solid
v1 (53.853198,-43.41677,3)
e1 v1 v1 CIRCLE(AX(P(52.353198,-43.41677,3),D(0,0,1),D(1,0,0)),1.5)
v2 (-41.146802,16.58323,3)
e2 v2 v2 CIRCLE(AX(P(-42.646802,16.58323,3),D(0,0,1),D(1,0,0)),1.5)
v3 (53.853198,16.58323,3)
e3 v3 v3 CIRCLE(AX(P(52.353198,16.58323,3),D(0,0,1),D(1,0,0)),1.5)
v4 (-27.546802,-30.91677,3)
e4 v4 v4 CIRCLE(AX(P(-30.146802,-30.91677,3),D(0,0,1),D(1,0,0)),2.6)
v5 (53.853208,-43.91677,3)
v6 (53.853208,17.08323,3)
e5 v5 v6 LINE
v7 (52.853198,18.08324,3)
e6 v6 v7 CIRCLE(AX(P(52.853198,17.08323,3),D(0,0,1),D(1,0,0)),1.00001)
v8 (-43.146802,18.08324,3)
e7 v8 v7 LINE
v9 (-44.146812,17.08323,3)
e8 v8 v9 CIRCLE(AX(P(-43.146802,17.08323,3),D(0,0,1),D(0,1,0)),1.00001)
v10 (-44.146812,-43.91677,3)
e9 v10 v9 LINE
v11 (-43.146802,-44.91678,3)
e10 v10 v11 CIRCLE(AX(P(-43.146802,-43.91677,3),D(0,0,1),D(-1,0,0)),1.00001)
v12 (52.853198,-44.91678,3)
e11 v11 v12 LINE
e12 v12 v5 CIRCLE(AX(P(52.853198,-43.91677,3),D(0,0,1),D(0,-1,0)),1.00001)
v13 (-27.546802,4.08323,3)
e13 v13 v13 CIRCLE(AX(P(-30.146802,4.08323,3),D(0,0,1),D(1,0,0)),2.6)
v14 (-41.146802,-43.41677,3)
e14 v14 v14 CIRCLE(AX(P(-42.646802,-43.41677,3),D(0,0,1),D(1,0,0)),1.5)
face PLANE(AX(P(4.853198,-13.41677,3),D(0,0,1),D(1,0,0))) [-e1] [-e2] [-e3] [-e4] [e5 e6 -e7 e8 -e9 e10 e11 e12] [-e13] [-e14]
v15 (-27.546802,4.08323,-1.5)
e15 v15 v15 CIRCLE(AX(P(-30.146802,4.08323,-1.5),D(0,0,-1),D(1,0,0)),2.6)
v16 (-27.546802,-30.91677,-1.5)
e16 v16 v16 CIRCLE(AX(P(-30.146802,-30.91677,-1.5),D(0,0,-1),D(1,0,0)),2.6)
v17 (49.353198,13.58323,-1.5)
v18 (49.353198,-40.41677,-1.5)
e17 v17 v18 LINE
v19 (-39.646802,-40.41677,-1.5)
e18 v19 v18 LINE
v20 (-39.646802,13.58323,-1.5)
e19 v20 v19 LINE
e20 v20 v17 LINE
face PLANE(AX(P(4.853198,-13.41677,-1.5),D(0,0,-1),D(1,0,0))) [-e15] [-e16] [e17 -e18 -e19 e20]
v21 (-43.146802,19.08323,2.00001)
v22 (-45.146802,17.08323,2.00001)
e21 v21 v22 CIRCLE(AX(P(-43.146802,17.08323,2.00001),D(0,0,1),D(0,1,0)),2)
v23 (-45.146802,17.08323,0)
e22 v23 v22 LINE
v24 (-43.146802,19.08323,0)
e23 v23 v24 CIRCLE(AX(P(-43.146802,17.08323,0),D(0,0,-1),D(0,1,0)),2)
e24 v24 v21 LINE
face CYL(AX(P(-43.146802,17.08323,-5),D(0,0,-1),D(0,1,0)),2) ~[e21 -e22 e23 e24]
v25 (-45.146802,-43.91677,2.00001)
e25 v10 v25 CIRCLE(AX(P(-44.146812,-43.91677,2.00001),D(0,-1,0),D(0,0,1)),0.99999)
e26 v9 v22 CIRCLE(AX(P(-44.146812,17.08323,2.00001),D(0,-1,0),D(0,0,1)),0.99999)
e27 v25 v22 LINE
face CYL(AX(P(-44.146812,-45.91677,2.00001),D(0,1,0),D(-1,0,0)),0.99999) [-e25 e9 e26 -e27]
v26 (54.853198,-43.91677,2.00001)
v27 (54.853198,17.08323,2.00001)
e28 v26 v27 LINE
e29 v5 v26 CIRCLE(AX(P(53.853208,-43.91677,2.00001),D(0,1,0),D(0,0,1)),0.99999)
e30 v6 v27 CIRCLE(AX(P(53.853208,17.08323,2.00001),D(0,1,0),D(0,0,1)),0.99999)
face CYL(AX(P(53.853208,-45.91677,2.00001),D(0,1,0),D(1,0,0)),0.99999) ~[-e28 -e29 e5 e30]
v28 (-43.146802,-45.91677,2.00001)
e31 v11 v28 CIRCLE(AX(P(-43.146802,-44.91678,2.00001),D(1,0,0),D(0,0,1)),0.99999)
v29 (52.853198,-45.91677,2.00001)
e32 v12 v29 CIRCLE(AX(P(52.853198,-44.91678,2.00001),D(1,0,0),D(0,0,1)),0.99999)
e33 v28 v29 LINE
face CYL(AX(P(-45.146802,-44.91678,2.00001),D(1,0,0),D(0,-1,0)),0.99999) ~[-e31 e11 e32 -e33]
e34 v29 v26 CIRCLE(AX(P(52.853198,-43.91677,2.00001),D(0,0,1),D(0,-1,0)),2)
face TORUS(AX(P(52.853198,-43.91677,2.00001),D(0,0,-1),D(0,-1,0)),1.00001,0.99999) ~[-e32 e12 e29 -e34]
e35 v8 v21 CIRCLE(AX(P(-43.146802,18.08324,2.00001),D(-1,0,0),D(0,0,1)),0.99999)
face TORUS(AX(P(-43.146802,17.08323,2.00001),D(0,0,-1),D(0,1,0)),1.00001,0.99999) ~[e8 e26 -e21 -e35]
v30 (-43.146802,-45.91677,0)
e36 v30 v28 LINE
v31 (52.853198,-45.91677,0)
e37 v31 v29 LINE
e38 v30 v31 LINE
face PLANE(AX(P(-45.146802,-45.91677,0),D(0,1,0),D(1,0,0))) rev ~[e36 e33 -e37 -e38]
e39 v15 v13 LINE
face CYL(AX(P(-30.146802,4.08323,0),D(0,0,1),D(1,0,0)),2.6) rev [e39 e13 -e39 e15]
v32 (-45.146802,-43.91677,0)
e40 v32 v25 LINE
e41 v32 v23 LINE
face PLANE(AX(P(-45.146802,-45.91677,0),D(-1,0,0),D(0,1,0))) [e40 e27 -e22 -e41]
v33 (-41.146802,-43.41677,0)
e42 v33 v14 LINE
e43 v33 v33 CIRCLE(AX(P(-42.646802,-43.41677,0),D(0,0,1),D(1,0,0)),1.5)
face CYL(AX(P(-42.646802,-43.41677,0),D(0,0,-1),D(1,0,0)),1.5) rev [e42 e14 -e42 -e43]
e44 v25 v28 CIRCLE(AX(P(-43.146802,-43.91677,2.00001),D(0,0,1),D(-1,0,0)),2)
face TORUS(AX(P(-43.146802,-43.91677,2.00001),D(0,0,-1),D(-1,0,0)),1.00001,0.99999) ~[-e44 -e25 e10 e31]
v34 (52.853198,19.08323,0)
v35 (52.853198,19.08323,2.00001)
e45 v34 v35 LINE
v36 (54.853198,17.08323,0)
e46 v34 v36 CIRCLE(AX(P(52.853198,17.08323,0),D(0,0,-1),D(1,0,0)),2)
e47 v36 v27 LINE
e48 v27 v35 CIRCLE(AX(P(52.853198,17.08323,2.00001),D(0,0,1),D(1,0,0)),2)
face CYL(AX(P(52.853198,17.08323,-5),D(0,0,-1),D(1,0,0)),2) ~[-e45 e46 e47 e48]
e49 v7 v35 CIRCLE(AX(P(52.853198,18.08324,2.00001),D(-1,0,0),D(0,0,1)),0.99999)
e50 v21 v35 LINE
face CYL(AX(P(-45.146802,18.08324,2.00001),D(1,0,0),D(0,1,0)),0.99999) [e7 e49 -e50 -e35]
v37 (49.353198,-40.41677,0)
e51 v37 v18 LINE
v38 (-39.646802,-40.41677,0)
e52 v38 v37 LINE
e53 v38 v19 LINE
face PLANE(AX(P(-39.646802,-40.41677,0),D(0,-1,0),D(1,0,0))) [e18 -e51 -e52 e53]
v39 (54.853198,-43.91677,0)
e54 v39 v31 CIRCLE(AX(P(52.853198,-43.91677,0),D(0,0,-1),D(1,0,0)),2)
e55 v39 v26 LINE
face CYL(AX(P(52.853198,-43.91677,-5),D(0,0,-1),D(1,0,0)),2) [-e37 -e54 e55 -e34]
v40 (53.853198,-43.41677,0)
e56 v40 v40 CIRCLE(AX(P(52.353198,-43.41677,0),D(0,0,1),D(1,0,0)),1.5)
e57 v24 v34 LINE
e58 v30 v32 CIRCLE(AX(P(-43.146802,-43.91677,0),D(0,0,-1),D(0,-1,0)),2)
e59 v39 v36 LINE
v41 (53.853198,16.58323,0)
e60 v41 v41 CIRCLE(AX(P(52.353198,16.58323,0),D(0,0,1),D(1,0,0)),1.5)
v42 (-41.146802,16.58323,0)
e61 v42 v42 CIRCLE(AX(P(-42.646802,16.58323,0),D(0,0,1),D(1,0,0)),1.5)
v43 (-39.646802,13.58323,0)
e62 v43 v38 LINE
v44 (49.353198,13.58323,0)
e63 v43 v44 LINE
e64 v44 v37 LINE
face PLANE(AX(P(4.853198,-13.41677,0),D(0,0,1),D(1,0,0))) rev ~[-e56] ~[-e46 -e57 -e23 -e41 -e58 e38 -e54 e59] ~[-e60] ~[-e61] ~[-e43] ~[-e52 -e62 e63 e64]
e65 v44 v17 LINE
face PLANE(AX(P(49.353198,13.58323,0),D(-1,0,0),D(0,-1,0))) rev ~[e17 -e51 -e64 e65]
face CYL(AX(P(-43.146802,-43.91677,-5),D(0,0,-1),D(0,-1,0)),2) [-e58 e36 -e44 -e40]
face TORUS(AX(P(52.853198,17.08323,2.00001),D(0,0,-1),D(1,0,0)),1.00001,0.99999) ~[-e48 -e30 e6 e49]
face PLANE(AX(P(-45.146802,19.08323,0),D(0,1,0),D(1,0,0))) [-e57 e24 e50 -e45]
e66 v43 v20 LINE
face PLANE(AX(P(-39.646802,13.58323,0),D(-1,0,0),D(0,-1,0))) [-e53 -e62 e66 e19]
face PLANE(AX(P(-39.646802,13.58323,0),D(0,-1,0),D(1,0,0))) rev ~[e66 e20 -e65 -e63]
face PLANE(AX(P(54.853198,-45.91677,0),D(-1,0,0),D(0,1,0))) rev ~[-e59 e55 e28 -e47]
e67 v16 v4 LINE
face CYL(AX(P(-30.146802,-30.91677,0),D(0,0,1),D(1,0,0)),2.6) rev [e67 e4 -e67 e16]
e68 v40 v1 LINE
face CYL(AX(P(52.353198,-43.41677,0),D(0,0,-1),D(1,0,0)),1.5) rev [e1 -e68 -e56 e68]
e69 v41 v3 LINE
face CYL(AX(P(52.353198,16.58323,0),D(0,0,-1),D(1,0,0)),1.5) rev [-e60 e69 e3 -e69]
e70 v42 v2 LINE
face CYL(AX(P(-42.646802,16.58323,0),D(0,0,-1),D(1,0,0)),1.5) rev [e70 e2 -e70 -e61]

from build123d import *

# Parameters (mm, degrees)
F0_W         = 100
F0_H         = 65
F0_R         = 1.5
F0_R_2       = 2.6
F1_DEPTH     = 3
F2_R         = 0.99999
F3_T1_DEPTH  = 8
F3_T4_ANGLE  = 90
F3_T6_ANGLE  = 90
F3_T8_ANGLE  = 90
F3_T10_ANGLE = 90
F4_W         = 89
F4_H         = 54
F4_R         = 2.6
F5_DEPTH     = 1.5


# Not quite as in the source:
# - a fillet or chamfer that OpenCascade refuses, or shapes differently, is made with other operations: its cross-section is extruded or revolved along the edge and cut away or added
# - a fillet or chamfer is up to 0.001 mm smaller than in the source, because OpenCascade refuses the exact size


with BuildPart() as f1:
    # F0 (on Top) → F1 (new body)
    with BuildSketch(Plane.XY):
        with Locations((4.8531983048, -13.4167700263)):
            Rectangle(F0_W, F0_H)
        with Locations((-42.6468016952, -43.4167700263)):
            Circle(F0_R, mode=Mode.SUBTRACT)
        with Locations((-30.1468016952, -30.9167700263)):
            Circle(F0_R_2, mode=Mode.SUBTRACT)
        with Locations((52.3531983048, -43.4167700263)):
            Circle(F0_R, mode=Mode.SUBTRACT)
        with Locations((-30.1468016952, 4.0832299737)):
            Circle(F0_R_2, mode=Mode.SUBTRACT)
        with Locations((-42.6468016952, 16.5832299737)):
            Circle(F0_R, mode=Mode.SUBTRACT)
        with Locations((52.3531983048, 16.5832299737)):
            Circle(F0_R, mode=Mode.SUBTRACT)
    extrude(amount=F1_DEPTH)

    # F2 (radius 1 in the source; OpenCascade refuses exactly that, so slightly less here)
    f2_edges = [f1.edges().sort_by_distance(p)[0] for p in [
        (-45.146802, -13.41677, 3),
        (4.853198, 19.08323, 3),
        (54.853198, -13.41677, 3),
        (4.853198, -45.91677, 3),
    ]]
    fillet(f2_edges, radius=F2_R)

    # F3: fillet of radius 2 on 4 edges, made by hand

    # F3_s2 → F3_t1 (cut)
    with BuildSketch(Plane.XY.offset(-5)):
        with BuildLine():
            ThreePointArc((-43.1468016952, -45.9167700263), (-44.5610152576, -45.3309835887), (-45.1468016952, -43.9167700263))
            Line((-45.1468016952, -43.9167700263), (-45.1468016952, -45.9167700263))
            Line((-45.1468016952, -45.9167700263), (-43.1468016952, -45.9167700263))
        make_face()
        with BuildLine():
            ThreePointArc((-43.1468016952, 19.0832299737), (-44.5610152576, 18.4974435361), (-45.1468016952, 17.0832299737))
            Line((-45.1468016952, 17.0832299737), (-45.1468016952, 19.0832299737))
            Line((-45.1468016952, 19.0832299737), (-43.1468016952, 19.0832299737))
        make_face()
        with BuildLine():
            ThreePointArc((54.8531983048, 17.0832299737), (54.2674118671, 18.4974435361), (52.8531983048, 19.0832299737))
            Line((52.8531983048, 19.0832299737), (54.8531983048, 19.0832299737))
            Line((54.8531983048, 19.0832299737), (54.8531983048, 17.0832299737))
        make_face()
        with BuildLine():
            ThreePointArc((54.8531983048, -43.9167700263), (54.2674118671, -45.3309835887), (52.8531983048, -45.9167700263))
            Line((52.8531983048, -45.9167700263), (54.8531983048, -45.9167700263))
            Line((54.8531983048, -45.9167700263), (54.8531983048, -43.9167700263))
        make_face()
    extrude(amount=F3_T1_DEPTH, mode=Mode.SUBTRACT)

    # F3_s3 → F3_t4 (revolve, cut)
    with BuildSketch(Plane.YZ.offset(52.8531983048)):
        with BuildLine():
            ThreePointArc((-44.9167800263, 3), (-45.6238797364, 2.7071097101), (-45.9167700263, 2.00001))
            Line((-45.9167700263, 2.00001), (-45.9167700263, 3))
            Line((-45.9167700263, 3), (-44.9167800263, 3))
        make_face()
    revolve(axis=Axis((52.8531983048, -43.9167700263, 3), (0, 0, 1)), revolution_arc=F3_T4_ANGLE, mode=Mode.SUBTRACT)

    # F3_s5 → F3_t6 (revolve, cut)
    with BuildSketch(Plane.XZ.offset(-17.0832299737)):
        with BuildLine():
            ThreePointArc((53.8532083048, 3), (54.5603080149, 2.7071097101), (54.8531983048, 2.00001))
            Line((54.8531983048, 2.00001), (54.8531983048, 3))
            Line((54.8531983048, 3), (53.8532083048, 3))
        make_face()
    revolve(axis=Axis((52.8531983048, 17.0832299737, 3), (0, 0, 1)), revolution_arc=F3_T6_ANGLE, mode=Mode.SUBTRACT)

    # F3_s7 → F3_t8 (revolve, cut)
    with BuildSketch(Plane.YZ.offset(-43.1468016952)):
        with BuildLine():
            ThreePointArc((18.0832399737, 3), (18.7903396838, 2.7071097101), (19.0832299737, 2.00001))
            Line((19.0832299737, 2.00001), (19.0832299737, 3))
            Line((19.0832299737, 3), (18.0832399737, 3))
        make_face()
    revolve(axis=Axis((-43.1468016952, 17.0832299737, 3), (0, 0, 1)), revolution_arc=F3_T8_ANGLE, mode=Mode.SUBTRACT)

    # F3_s9 → F3_t10 (revolve, cut)
    with BuildSketch(Plane.XZ.offset(43.9167700263)):
        with BuildLine():
            ThreePointArc((-44.1468116952, 3), (-44.8539114053, 2.7071097101), (-45.1468016952, 2.00001))
            Line((-45.1468016952, 2.00001), (-45.1468016952, 3))
            Line((-45.1468016952, 3), (-44.1468116952, 3))
        make_face()
    revolve(axis=Axis((-43.1468016952, -43.9167700263, 3), (0, 0, 1)), revolution_arc=F3_T10_ANGLE, mode=Mode.SUBTRACT)

    # F4 (on face) → F5 (join)
    with BuildSketch(Plane(origin=(0, 0, 0), x_dir=(1, 0, 0), z_dir=(0, 0, -1))):
        with Locations((4.8531983048, 13.4167700263)):
            Rectangle(F4_W, F4_H)
        with Locations((-30.1468016952, -4.0832299737)):
            Circle(F4_R, mode=Mode.SUBTRACT)
        with Locations((-30.1468016952, 30.9167700263)):
            Circle(F4_R, mode=Mode.SUBTRACT)
    extrude(amount=F5_DEPTH)


solid = f1.part
